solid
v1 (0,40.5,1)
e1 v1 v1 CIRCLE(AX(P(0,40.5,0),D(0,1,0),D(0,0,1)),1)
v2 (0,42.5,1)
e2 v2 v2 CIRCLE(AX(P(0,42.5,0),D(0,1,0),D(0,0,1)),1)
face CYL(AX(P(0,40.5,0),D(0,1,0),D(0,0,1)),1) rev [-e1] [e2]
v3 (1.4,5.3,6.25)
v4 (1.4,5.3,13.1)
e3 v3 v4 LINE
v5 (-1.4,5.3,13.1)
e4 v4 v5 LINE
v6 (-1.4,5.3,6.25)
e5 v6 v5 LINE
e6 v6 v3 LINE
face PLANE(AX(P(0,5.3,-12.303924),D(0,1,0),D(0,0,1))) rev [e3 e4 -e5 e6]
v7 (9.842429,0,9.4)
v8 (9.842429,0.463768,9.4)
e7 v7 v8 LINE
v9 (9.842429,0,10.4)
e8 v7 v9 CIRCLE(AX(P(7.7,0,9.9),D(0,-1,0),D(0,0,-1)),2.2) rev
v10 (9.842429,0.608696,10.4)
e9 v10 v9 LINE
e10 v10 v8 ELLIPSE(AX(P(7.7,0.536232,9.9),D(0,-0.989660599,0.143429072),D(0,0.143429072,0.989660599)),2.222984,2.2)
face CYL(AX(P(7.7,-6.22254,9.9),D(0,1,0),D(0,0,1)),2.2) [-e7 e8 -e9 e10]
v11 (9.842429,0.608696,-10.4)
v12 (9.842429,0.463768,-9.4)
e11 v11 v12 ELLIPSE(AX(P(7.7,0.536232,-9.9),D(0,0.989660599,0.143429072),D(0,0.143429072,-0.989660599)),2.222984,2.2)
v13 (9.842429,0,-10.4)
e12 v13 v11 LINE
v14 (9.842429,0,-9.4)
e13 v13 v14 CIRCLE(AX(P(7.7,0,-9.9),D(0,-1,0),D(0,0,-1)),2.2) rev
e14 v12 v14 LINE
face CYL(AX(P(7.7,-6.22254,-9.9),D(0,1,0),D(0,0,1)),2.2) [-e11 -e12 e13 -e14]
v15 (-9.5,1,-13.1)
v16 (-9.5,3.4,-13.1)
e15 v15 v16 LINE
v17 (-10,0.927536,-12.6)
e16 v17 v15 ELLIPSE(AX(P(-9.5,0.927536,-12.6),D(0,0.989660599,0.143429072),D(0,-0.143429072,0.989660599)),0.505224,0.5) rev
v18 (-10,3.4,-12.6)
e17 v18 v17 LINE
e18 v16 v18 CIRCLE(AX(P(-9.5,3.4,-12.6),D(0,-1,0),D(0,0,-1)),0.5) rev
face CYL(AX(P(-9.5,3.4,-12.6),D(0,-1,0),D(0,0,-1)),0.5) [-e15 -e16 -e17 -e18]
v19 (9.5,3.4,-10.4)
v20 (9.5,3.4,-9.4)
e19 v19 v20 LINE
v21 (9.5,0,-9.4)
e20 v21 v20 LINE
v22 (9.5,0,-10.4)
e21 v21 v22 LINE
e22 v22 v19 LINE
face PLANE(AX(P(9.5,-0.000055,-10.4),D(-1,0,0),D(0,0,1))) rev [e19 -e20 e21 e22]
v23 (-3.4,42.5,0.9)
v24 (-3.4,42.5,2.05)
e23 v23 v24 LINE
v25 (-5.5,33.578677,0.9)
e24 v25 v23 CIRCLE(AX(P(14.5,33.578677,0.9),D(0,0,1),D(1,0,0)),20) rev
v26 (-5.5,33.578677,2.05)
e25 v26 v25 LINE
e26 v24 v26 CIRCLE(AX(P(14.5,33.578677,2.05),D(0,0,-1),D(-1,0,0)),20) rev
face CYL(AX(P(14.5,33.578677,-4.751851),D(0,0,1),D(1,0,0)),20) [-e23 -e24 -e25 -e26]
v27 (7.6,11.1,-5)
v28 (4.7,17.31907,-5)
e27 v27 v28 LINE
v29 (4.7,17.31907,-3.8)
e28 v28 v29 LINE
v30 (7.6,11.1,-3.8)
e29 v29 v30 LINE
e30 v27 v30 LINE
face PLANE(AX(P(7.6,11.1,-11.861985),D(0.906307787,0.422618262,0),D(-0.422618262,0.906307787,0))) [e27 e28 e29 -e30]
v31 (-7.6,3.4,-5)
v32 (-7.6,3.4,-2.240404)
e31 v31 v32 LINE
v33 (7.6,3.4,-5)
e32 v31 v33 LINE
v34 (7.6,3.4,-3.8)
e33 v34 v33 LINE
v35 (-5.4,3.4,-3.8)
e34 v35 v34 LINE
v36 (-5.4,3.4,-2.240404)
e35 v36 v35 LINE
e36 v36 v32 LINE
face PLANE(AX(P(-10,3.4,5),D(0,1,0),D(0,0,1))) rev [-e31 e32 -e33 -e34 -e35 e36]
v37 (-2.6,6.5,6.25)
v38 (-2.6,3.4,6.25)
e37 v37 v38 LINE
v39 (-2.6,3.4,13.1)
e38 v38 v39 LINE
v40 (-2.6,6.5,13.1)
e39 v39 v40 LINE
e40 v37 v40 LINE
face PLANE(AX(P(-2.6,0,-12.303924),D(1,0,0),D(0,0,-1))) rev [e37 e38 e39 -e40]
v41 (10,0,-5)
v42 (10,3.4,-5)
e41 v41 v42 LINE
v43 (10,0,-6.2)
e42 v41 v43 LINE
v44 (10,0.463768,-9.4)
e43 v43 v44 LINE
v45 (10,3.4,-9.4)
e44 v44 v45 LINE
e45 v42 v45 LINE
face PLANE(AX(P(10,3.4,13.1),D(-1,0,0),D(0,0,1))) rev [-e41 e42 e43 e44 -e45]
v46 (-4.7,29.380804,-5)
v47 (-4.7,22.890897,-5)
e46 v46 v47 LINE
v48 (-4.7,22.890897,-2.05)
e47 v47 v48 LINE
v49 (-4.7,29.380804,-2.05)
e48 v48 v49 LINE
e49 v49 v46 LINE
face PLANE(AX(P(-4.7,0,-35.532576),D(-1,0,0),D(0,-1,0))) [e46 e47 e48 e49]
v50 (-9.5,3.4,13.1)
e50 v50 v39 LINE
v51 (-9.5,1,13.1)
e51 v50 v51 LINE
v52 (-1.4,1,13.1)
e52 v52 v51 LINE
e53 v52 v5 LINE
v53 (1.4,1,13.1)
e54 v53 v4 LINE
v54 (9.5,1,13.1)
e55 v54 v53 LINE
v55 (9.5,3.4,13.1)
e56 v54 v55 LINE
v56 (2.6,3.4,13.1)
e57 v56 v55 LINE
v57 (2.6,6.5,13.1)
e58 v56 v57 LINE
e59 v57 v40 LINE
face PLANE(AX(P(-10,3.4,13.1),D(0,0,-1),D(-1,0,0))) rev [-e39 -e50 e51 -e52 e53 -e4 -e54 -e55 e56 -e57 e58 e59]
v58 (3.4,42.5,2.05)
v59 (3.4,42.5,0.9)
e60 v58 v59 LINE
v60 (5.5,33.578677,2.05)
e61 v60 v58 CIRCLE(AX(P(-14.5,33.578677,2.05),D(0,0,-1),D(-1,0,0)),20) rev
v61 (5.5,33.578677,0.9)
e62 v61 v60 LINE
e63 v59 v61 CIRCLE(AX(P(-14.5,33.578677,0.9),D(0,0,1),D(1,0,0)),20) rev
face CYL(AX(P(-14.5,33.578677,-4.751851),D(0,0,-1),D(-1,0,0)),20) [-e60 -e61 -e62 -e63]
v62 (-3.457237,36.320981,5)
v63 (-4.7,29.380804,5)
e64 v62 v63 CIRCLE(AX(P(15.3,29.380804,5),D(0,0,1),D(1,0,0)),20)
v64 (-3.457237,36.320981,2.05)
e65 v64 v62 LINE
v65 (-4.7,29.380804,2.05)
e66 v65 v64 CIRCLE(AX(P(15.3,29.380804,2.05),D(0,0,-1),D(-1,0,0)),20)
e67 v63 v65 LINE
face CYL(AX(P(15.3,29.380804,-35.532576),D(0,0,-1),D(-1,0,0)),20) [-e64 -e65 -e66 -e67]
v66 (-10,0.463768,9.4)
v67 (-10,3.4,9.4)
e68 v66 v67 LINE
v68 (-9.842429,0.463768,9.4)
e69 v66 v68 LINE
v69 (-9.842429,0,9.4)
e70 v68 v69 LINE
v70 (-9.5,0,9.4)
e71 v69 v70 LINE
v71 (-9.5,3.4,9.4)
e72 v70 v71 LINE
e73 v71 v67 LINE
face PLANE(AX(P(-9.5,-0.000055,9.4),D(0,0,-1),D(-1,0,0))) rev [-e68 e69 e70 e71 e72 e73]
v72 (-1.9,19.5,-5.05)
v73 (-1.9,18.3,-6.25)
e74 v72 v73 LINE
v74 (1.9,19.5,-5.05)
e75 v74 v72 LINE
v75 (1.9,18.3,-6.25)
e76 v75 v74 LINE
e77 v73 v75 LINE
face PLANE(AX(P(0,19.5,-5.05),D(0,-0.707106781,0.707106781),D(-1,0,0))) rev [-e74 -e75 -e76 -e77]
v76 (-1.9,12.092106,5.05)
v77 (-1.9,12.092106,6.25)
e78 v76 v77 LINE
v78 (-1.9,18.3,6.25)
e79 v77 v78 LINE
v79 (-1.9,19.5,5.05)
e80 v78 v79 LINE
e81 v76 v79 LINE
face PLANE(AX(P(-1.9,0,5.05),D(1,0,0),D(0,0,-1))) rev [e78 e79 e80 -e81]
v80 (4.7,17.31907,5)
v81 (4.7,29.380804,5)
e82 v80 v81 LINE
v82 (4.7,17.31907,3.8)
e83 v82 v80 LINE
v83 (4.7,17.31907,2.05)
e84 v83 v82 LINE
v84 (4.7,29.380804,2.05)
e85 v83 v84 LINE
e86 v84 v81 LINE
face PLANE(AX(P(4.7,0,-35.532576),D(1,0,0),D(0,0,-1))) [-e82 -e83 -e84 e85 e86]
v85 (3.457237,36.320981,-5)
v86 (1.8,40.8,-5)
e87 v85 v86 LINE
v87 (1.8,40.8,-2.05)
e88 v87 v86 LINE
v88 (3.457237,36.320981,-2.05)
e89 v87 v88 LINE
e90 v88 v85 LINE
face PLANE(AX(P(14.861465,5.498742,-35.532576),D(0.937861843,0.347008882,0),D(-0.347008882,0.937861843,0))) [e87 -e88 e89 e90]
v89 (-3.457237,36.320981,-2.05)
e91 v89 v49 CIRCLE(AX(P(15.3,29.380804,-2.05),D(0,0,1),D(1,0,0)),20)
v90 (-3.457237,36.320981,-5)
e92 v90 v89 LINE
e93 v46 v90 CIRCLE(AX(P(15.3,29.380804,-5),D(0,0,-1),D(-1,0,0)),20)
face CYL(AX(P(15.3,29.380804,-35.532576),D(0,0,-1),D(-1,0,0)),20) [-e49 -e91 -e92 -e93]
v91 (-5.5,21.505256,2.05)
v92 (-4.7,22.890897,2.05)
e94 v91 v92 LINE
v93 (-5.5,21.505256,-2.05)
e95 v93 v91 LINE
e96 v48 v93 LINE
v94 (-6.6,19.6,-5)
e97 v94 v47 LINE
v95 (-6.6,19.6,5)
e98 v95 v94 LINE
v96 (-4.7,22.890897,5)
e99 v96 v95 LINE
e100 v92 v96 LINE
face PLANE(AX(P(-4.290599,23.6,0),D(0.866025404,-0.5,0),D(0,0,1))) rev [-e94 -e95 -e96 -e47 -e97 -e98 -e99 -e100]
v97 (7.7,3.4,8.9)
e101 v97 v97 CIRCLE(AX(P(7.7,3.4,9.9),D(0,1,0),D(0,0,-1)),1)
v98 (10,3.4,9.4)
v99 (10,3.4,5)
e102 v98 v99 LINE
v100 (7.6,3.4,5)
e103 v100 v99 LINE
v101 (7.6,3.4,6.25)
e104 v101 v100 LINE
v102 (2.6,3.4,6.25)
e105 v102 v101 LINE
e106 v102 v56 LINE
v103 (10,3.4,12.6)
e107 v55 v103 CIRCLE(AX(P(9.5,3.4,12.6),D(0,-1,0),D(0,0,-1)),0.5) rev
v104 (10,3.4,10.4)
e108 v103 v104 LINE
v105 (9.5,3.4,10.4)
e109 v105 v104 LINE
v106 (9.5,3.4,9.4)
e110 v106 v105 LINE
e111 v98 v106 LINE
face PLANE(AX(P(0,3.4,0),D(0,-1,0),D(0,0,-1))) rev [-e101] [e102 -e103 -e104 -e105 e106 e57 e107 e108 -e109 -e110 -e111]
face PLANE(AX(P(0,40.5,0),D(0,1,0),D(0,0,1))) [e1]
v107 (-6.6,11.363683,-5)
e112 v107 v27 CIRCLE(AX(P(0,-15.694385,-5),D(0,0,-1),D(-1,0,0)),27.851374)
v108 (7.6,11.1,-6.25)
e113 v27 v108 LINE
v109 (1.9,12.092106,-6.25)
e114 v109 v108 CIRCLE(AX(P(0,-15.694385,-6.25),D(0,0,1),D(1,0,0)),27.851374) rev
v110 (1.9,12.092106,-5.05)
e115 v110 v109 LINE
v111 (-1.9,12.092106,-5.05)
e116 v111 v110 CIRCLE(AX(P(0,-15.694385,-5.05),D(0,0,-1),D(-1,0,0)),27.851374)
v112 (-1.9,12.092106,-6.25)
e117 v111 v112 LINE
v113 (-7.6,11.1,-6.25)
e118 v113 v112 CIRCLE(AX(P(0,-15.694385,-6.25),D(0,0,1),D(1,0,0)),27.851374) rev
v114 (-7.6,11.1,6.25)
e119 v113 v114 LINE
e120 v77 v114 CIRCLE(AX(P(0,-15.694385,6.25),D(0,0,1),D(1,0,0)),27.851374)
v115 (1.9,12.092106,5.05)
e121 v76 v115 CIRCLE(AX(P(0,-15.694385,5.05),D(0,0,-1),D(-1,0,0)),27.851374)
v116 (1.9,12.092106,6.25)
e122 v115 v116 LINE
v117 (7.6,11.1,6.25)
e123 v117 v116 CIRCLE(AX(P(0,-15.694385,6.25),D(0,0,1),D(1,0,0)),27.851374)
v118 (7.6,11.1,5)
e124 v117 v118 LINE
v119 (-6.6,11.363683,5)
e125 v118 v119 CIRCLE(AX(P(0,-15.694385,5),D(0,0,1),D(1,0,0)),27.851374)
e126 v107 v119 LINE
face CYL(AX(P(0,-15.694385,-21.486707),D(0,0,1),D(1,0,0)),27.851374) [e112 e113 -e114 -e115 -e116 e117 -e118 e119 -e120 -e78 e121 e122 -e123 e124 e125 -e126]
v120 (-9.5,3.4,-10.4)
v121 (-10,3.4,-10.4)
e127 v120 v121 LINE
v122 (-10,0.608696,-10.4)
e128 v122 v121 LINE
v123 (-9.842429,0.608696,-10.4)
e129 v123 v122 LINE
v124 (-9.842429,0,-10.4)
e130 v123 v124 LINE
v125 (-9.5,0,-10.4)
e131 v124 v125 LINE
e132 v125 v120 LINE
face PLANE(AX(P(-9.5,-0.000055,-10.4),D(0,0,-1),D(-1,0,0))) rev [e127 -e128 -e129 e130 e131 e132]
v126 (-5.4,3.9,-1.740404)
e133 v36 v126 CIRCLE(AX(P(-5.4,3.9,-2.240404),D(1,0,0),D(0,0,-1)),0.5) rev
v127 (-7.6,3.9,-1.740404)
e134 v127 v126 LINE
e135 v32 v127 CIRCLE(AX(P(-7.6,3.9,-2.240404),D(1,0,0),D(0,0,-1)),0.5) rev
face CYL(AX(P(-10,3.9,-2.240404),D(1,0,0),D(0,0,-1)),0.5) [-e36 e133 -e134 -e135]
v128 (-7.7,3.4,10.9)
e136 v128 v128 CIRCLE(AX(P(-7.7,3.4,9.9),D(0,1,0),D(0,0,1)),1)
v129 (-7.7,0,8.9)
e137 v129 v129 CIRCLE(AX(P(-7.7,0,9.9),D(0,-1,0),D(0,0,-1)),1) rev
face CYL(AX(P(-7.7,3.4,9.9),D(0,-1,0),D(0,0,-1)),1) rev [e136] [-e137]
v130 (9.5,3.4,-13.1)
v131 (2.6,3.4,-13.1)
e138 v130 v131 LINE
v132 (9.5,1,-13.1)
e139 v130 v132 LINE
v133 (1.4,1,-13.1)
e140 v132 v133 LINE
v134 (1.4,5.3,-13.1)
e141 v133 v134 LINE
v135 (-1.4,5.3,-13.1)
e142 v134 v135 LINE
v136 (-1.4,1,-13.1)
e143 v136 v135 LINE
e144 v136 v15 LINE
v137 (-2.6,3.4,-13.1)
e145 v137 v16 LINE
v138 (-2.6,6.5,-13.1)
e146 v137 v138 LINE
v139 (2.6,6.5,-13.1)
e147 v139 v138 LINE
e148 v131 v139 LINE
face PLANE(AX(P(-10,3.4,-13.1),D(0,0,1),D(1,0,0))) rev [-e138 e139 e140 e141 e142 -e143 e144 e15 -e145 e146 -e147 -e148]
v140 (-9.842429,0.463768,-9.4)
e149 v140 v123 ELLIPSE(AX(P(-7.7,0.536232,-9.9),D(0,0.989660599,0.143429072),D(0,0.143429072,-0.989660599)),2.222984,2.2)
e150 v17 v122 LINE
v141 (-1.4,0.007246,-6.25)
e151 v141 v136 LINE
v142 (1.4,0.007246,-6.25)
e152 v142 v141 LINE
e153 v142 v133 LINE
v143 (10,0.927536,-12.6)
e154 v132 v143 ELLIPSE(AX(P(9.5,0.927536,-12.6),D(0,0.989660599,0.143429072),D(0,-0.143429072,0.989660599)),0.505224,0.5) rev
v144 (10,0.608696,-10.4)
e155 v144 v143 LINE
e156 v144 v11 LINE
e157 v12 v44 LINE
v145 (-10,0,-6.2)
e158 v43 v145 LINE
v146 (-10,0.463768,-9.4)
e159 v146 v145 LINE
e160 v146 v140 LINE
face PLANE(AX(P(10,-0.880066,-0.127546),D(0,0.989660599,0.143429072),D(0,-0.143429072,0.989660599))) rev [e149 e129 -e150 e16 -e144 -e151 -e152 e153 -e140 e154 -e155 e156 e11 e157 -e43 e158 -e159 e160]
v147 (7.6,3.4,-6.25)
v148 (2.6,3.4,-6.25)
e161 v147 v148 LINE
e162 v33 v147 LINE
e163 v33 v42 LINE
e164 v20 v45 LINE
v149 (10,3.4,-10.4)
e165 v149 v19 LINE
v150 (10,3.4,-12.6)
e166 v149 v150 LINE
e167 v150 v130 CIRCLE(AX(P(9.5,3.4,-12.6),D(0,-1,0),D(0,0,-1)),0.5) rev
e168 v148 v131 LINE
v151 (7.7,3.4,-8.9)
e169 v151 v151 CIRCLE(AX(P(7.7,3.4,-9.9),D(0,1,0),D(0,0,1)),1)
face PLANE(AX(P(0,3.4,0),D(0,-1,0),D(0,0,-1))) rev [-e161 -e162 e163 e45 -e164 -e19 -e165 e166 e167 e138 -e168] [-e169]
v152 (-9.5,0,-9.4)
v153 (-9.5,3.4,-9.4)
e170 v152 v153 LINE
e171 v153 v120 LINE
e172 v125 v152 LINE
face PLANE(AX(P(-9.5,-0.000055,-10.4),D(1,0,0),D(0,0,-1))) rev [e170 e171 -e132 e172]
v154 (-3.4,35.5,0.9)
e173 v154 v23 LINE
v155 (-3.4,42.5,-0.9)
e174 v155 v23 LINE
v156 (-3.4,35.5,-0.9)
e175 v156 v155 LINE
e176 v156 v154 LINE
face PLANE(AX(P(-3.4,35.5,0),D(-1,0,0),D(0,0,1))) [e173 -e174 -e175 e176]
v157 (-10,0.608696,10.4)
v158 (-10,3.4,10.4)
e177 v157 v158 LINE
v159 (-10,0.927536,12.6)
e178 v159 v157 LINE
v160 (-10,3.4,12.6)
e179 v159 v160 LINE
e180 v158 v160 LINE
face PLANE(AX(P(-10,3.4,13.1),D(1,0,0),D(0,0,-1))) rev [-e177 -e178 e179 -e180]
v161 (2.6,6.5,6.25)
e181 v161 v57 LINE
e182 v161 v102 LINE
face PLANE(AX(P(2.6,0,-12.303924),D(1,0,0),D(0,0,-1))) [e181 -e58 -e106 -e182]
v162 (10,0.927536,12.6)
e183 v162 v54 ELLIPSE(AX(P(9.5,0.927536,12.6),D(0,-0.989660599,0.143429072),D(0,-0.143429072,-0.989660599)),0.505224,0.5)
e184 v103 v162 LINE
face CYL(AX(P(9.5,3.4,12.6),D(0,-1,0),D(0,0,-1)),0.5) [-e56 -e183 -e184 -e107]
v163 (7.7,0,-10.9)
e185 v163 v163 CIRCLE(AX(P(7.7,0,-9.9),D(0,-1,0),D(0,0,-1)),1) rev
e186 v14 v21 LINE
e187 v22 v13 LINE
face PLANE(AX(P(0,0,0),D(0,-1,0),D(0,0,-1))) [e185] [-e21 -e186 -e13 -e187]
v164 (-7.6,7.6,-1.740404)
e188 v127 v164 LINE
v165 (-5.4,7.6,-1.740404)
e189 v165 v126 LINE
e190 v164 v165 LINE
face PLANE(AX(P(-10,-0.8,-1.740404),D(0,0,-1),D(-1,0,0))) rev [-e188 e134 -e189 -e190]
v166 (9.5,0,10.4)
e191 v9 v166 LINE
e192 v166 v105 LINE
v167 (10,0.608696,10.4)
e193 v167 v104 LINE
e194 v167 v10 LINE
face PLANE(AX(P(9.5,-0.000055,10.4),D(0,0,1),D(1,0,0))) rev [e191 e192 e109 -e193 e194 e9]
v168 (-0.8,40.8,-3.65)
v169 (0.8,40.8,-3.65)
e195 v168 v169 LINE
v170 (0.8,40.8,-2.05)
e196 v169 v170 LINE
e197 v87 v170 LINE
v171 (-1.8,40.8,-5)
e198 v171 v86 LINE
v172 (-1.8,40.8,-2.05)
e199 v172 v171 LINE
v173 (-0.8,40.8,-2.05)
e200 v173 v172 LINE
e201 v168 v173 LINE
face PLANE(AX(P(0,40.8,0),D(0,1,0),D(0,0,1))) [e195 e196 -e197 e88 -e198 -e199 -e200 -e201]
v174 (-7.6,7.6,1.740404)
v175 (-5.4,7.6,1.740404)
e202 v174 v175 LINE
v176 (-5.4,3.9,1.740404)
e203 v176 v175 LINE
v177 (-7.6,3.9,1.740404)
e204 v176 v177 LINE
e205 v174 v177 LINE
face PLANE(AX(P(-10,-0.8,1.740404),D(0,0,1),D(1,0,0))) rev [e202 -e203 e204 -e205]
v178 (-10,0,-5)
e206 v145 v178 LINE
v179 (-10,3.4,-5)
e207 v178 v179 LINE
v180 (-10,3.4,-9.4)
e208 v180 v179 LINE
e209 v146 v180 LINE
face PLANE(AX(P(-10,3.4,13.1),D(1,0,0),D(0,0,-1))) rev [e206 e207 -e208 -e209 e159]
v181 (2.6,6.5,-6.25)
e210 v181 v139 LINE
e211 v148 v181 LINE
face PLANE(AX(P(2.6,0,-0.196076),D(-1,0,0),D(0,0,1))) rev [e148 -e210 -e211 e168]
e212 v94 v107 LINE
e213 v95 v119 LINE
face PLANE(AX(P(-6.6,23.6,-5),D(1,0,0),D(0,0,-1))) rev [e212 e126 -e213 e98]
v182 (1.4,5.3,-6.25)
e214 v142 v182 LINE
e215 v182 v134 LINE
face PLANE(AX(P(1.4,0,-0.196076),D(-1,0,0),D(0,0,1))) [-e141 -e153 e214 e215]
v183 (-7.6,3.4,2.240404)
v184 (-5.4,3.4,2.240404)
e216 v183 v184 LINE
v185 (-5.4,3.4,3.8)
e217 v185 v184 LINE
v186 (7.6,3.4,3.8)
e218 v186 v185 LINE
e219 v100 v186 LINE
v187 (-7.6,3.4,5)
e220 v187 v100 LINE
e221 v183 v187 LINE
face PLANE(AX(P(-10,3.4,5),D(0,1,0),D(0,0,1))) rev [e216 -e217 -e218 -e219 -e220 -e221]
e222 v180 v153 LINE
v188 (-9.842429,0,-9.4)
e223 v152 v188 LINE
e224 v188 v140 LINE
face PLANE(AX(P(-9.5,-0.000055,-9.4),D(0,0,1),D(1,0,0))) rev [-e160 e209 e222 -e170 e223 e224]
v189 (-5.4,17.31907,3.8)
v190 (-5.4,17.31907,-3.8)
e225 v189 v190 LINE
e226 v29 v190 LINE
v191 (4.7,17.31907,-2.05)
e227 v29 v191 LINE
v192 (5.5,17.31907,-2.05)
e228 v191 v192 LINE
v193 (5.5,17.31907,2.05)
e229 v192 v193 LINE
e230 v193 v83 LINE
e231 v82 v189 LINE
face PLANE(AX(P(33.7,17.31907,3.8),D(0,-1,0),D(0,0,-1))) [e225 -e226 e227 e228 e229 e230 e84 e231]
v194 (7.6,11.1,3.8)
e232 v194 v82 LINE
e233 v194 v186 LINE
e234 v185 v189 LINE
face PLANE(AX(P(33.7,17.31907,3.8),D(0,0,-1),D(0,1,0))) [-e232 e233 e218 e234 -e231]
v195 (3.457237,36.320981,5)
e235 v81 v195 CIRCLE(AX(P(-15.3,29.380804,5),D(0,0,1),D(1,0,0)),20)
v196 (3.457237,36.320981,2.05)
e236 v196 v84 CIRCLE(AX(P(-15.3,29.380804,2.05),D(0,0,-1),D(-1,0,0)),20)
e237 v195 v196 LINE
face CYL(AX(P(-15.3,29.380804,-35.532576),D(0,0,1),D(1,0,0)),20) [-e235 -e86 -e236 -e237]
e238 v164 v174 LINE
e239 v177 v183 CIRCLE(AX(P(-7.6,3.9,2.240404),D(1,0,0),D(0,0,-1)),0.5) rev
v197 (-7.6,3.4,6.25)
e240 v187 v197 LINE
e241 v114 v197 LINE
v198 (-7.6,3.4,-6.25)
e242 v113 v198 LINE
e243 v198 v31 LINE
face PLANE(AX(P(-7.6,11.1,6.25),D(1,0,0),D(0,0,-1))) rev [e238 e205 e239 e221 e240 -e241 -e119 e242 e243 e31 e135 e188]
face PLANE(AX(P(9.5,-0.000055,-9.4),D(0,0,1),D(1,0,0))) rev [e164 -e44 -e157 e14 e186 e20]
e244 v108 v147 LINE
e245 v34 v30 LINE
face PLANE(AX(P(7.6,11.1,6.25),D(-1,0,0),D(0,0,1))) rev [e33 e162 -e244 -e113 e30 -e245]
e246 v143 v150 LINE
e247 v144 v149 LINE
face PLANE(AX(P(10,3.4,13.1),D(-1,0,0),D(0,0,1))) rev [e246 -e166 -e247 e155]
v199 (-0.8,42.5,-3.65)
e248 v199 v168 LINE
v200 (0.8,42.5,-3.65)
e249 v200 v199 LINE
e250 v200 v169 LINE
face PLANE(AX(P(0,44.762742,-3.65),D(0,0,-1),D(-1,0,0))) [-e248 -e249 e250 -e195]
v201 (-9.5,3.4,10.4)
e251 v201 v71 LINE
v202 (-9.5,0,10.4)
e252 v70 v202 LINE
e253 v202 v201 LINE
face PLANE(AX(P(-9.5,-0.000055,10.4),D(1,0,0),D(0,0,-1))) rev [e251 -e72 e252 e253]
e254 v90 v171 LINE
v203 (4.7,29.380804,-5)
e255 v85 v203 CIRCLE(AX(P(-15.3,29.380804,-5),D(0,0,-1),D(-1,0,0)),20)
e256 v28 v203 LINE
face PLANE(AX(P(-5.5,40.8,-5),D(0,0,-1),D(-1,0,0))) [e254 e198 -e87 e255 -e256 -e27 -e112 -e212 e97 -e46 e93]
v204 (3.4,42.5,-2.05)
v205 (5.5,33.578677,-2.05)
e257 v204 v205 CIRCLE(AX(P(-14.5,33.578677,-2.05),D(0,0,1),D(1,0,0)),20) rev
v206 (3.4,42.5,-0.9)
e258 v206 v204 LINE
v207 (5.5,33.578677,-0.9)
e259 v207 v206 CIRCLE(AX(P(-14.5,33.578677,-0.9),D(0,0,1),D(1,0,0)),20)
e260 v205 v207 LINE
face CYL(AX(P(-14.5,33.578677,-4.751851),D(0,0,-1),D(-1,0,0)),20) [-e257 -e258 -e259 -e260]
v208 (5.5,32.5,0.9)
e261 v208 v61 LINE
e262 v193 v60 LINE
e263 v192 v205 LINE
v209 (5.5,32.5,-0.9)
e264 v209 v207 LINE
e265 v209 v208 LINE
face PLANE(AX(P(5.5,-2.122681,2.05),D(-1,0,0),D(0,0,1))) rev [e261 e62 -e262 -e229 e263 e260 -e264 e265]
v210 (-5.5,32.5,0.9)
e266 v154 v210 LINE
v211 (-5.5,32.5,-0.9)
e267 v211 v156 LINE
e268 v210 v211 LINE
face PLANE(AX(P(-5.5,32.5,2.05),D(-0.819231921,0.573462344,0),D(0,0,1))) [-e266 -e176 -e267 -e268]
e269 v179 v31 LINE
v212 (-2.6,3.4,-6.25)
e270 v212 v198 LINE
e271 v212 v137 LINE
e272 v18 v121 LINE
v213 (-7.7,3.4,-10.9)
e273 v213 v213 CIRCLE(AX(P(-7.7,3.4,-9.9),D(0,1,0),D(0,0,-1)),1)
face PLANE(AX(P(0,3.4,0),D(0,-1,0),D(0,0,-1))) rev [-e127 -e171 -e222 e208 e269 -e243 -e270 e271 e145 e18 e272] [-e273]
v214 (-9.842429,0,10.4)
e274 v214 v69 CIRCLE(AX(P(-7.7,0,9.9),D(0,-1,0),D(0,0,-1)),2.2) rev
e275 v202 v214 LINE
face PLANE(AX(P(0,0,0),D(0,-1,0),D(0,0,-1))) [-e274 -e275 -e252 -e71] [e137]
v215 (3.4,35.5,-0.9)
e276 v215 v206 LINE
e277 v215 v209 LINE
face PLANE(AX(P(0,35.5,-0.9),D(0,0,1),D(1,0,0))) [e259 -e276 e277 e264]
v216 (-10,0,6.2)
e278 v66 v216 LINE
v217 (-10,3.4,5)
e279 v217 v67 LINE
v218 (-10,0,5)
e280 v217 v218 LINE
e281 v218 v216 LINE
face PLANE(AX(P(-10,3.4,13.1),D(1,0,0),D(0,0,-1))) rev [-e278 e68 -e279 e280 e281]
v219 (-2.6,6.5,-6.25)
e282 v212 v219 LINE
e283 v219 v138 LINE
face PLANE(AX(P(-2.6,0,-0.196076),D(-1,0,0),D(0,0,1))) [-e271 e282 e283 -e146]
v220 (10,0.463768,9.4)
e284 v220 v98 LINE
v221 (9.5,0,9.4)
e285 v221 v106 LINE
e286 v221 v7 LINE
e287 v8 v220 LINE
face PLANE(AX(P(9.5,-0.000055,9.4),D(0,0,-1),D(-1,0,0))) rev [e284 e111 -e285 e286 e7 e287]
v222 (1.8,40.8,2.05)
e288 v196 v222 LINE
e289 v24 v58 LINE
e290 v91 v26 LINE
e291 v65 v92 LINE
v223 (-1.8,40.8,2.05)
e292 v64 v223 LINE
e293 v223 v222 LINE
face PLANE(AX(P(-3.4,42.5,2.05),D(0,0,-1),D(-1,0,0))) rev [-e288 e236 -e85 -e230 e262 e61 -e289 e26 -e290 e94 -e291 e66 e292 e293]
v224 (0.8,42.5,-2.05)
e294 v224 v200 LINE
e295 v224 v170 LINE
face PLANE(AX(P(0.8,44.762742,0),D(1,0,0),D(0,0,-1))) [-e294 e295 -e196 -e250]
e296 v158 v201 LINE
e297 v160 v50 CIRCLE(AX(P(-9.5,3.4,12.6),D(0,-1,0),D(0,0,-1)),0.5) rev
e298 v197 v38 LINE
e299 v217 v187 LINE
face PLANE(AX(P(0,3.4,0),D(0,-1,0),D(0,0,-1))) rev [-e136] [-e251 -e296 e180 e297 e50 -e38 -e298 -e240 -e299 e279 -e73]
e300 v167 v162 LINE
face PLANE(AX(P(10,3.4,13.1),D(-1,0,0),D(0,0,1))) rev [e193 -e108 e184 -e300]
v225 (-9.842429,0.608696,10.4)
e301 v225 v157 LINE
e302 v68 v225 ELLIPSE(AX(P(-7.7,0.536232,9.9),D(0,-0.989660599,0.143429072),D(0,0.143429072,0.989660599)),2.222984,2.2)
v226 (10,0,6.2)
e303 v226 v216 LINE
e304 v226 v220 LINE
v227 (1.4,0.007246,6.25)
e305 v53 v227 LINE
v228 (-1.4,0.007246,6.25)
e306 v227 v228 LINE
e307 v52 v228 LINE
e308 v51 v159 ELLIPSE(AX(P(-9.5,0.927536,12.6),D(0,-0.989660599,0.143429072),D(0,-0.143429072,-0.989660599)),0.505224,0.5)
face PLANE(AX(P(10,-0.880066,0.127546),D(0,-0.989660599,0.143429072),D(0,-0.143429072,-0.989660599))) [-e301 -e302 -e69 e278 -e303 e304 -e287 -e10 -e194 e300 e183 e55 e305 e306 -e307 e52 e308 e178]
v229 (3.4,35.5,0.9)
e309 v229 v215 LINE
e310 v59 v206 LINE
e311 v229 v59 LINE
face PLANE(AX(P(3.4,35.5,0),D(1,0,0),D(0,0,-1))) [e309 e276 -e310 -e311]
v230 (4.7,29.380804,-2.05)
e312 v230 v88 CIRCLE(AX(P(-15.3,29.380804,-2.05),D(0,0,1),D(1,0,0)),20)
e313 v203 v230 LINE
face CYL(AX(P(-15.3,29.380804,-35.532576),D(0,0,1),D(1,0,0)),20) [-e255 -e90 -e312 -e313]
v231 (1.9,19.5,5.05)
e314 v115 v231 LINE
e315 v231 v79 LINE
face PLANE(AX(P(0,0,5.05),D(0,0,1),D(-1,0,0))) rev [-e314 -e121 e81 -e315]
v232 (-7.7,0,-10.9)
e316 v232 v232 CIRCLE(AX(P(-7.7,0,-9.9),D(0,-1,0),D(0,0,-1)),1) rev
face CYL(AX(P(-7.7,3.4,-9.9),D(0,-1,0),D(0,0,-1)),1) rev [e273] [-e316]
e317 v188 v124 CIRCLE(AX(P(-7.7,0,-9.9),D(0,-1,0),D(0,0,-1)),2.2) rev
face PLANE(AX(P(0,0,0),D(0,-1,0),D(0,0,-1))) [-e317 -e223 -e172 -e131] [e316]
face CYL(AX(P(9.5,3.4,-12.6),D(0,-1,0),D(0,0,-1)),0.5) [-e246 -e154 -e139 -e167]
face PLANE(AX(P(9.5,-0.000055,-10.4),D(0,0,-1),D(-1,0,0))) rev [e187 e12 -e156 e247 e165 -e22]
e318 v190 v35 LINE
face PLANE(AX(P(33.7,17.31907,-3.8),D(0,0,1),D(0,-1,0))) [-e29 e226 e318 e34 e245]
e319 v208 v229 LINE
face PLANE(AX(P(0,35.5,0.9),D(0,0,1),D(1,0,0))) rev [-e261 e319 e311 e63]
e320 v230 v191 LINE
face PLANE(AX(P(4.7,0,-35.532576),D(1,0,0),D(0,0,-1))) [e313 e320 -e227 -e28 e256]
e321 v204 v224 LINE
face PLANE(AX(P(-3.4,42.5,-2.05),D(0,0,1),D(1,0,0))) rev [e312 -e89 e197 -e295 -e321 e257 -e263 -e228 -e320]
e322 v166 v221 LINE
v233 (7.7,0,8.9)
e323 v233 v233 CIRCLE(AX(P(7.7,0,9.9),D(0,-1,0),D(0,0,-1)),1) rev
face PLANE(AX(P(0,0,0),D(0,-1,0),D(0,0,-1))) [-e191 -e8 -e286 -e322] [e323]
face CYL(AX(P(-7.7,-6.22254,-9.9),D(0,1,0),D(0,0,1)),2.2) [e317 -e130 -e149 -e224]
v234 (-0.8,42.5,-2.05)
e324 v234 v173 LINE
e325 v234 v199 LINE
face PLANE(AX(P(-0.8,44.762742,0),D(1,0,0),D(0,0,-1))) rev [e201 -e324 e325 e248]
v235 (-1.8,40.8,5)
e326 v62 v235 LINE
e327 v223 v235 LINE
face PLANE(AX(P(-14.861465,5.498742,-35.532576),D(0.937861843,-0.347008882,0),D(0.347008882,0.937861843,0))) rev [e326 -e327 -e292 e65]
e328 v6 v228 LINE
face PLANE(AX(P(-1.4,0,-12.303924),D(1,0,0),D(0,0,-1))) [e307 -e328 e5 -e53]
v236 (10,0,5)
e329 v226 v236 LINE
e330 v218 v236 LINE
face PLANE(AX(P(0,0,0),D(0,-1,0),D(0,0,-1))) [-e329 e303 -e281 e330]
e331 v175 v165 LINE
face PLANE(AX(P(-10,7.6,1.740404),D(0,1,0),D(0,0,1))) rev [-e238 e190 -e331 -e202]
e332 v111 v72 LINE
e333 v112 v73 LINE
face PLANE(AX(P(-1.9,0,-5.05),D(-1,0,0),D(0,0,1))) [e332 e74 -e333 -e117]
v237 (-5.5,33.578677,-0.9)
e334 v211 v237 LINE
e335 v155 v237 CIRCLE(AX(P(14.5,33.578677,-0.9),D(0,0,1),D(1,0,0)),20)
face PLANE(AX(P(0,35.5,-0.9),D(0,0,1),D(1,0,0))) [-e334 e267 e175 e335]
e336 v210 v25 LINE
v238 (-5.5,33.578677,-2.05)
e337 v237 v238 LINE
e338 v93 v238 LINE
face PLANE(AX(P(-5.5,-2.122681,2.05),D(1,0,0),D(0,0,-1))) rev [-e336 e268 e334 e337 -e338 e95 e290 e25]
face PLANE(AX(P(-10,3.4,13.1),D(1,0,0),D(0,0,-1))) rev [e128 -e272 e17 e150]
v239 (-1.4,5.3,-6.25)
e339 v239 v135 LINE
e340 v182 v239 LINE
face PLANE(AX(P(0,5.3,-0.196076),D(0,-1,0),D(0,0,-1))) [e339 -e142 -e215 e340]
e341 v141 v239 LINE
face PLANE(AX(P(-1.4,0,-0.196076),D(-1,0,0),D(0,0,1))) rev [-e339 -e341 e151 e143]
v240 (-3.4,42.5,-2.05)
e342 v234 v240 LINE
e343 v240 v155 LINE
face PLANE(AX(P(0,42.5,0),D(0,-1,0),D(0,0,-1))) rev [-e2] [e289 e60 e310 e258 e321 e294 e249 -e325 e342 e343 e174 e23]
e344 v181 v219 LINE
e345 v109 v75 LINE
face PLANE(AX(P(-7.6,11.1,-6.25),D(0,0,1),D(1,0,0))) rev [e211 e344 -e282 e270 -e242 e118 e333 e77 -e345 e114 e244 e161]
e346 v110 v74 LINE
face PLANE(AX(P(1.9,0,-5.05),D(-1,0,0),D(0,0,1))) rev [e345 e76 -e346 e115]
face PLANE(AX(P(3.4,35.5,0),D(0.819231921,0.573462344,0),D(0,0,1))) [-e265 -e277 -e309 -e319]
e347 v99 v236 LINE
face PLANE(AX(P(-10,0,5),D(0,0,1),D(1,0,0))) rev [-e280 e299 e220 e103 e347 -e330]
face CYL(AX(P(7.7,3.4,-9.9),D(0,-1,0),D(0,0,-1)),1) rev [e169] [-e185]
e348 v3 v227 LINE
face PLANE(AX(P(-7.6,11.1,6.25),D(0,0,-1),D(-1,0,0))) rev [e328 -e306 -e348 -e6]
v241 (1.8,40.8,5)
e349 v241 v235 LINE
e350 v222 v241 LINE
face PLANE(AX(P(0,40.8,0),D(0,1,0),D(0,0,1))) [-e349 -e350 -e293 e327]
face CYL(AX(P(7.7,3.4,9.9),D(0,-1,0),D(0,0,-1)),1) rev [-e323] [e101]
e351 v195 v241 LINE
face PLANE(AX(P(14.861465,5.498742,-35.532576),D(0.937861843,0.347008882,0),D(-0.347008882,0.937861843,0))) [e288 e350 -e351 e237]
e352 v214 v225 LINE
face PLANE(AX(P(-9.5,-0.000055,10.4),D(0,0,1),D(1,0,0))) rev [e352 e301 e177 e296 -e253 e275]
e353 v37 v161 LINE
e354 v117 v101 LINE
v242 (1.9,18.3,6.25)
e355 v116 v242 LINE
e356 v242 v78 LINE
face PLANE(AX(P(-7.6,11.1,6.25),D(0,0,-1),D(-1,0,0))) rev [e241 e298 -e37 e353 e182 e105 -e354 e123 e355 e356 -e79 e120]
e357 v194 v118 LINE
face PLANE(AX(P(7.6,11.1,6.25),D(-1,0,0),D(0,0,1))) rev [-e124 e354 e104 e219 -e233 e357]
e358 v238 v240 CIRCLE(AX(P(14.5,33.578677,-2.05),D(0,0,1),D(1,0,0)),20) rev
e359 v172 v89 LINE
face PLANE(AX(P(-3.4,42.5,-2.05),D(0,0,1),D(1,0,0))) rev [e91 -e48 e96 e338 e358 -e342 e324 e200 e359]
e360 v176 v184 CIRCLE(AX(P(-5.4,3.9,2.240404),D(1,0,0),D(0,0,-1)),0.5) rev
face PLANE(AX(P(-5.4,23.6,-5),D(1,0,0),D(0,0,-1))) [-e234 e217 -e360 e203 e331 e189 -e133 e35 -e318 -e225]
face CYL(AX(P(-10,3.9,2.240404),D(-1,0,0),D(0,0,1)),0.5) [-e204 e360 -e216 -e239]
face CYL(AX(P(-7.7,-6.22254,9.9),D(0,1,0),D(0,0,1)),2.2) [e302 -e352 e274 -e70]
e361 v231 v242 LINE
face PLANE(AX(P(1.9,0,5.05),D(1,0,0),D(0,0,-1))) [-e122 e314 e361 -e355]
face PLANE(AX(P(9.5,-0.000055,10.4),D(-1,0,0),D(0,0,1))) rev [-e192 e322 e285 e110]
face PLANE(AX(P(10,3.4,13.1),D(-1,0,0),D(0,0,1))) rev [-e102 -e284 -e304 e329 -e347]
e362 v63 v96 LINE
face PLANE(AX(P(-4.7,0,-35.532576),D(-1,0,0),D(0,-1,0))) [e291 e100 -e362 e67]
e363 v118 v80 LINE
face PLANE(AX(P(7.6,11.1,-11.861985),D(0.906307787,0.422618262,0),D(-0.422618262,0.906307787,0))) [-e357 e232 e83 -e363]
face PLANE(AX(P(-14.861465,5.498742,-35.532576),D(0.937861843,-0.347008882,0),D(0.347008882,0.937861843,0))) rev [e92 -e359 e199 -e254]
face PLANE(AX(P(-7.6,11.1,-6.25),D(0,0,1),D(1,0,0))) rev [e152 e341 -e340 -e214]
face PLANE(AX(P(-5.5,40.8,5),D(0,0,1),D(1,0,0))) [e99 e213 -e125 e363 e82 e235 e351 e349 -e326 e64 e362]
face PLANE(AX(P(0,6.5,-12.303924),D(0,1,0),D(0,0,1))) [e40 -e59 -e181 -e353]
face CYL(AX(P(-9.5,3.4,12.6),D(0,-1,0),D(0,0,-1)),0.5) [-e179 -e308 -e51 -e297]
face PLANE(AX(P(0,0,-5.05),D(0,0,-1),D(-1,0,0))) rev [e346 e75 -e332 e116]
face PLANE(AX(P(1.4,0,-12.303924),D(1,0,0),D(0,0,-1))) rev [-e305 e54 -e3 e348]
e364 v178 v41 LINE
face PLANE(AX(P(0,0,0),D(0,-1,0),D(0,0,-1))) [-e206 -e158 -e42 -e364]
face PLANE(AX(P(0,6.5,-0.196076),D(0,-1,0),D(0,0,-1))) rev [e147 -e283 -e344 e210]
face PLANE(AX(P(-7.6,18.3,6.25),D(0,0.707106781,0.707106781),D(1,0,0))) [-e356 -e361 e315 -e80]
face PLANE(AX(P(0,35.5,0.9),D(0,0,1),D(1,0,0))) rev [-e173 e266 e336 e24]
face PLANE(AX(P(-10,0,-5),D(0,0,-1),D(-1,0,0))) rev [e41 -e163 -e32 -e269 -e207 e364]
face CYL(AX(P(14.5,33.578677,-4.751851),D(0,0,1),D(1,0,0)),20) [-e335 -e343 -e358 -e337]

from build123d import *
from OCP.BRepFilletAPI import BRepFilletAPI_MakeChamfer

# Parameters (mm, degrees)
SKETCH1_W                 = 20
SKETCH1_H                 = 26.2
SKETCH1_R                 = 1
BOSS_EXTRUDE1_DEPTH       = 3.4
SKETCH2_W                 = 11
SKETCH2_H                 = 10
BOSS_EXTRUDE2_DEPTH       = 40.8
SKETCH3_W                 = 6.8
SKETCH3_H                 = 4.1
BOSS_EXTRUDE3_DEPTH       = 1.7
SKETCH4_R                 = 1
CUT_EXTRUDE1_DEPTH        = 2
CUT_EXTRUDE2_START        = -10
SKETCH6_W                 = 0.8
SKETCH6_H                 = 27.4
CUT_EXTRUDE2_DEPTH        = 10
BOSS_EXTRUDE4_DEPTH       = 4.1
SKETCH9_W                 = 3.7
SKETCH9_H                 = 4.1
BOSS_EXTRUDE5_DEPTH       = 37.4
SKETCH10_W                = 2.1
SKETCH10_H                = 1.8
CUT_EXTRUDE3_DEPTH        = 7
CHAMFER1_SIZE             = 3
CHAMFER1_SIZE_2           = 2.1
FILLET1_R                 = 20
FILLET2_R                 = 20
SKETCH11_W                = 15.2
SKETCH11_H                = 12.5
BOSS_EXTRUDE6_DEPTH       = 7.7
SKETCH12_W                = 6.6
SKETCH12_H                = 10
BOSS_EXTRUDE7_DEPTH       = 12.5
CHAMFER2_SIZE             = 4
CHAMFER2_SIZE_2           = 2.309401077
BOSS_EXTRUDE8_REACH       = 49.264
BOSS_EXTRUDE9_REACH       = 49.756
SKETCH16_W                = 3.480808908
SKETCH16_H                = 8.4
CUT_EXTRUDE4_DEPTH        = 49.763305876
SKETCH17_W                = 10
SKETCH17_H                = 3.4
CUT_EXTRUDE5_DEPTH        = 49.763305876
BOSS_EXTRUDE10_START      = -26.2
BOSS_EXTRUDE10_DEPTH      = 26.2
SKETCH19_W                = 3.480808908
SKETCH19_H                = 4.2
CUT_EXTRUDE6_DEPTH        = 48.829070658
SKETCH20_W                = 2.8
SKETCH20_H                = 3.4
CUT_EXTRUDE7_DEPTH        = 6.85
SKETCH21_W                = 2.8
SKETCH21_H                = 3.4
CUT_EXTRUDE8_DEPTH        = 6.85
BOSS_EXTRUDE11_START      = -1.2
BOSS_EXTRUDE11_DEPTH      = 1.2
CHAMFER3_SIZE             = 1.2
CHAMFER3_OF_MIRROR10_SIZE = 1.2
FILLET3_R                 = 0.5
CUT_EXTRUDE10_DEPTH       = 49.763305876
CUT_EXTRUDE10_DEPTH_BACK  = 49.763305876
BOSS_EXTRUDE12_START      = -3.4
SKETCH26_R                = 2.2
SKETCH26_R_2              = 1
BOSS_EXTRUDE12_DEPTH      = 3.4
SKETCH27_W                = 1.6
SKETCH27_H                = 1.6
BOSS_EXTRUDE13_DEPTH      = 1.7
CUT_EXTRUDE12_DEPTH       = 29
CUT_EXTRUDE12_DEPTH_BACK  = 10.1
SKETCH28_W                = 7.6
SKETCH28_H                = 15
FILLET4_R                 = 0.5
SKETCH29_W                = 0.5
SKETCH29_H                = 1
CUT_EXTRUDE13_DEPTH       = 43.43135633


# Some blends are built 0.0001 mm under size
with BuildPart() as part:
    # Sketch1 → Boss-Extrude1 (new body)
    with BuildSketch(Plane(origin=(0, 0, 0), x_dir=(1, 0, 0), z_dir=(0, 1, 0))):
        Rectangle(SKETCH1_W, SKETCH1_H)
        with Locations(Location((7.7, 9.9, 0), (0, 0, 270))):
            Circle(SKETCH1_R, mode=Mode.SUBTRACT)
        with Locations(Location((-7.7, 9.9, 0), (0, 0, 90))):
            Circle(SKETCH1_R, mode=Mode.SUBTRACT)
        with Locations(Location((7.7, -9.9, 0), (0, 0, 90))):
            Circle(SKETCH1_R, mode=Mode.SUBTRACT)
        with Locations(Location((-7.7, -9.9, 0), (0, 0, 270))):
            Circle(SKETCH1_R, mode=Mode.SUBTRACT)
    extrude(amount=BOSS_EXTRUDE1_DEPTH)

    # Sketch2 → Boss-Extrude2 (add)
    with BuildSketch(Plane.XZ):
        Rectangle(SKETCH2_W, SKETCH2_H)
    extrude(amount=-BOSS_EXTRUDE2_DEPTH)

    # Sketch3 → Boss-Extrude3 (add)
    with BuildSketch(Plane(origin=(0, 40.8, 0), x_dir=(1, 0, 0), z_dir=(0, 1, 0))):
        Rectangle(SKETCH3_W, SKETCH3_H)
    extrude(amount=BOSS_EXTRUDE3_DEPTH)

    # Sketch4 → Cut-Extrude1 (cut)
    with BuildSketch(Plane(origin=(0, 42.5, 0), x_dir=(1, 0, 0), z_dir=(0, 1, 0))):
        with Locations(Location((0, 0, 0), (0, 0, 270))):
            Circle(SKETCH4_R)
    extrude(amount=-CUT_EXTRUDE1_DEPTH, mode=Mode.SUBTRACT)

    # Sketch6 → Cut-Extrude2 (cut)
    with BuildSketch(Plane.XY.offset(5).offset(CUT_EXTRUDE2_START)):
        with Locations((-5.1, 17.1)):
            Rectangle(SKETCH6_W, SKETCH6_H)
        Polygon((-5.5, 30.8), (-4.7, 32.962162162), (-4.7, 40.8), (-5.5, 40.8), align=None)
        Polygon((-4.7, 30.8), (-4.7, 32.962162162), (-5.5, 30.8), align=None)
        Polygon((-4.7, 32.962162162), (-1.8, 40.8), (-4.7, 40.8), align=None)
        Polygon((4.7, 40.8), (1.8, 40.8), (4.7, 32.962162162), align=None)
        Polygon((5.5, 40.8), (4.7, 40.8), (4.7, 32.962162162), (5.5, 30.8), align=None)
        Polygon((5.5, 30.8), (4.7, 32.962162162), (4.7, 30.8), align=None)
        with Locations((5.1, 17.1)):
            Rectangle(SKETCH6_W, SKETCH6_H)
    cut_extrude2 = extrude(amount=CUT_EXTRUDE2_DEPTH, mode=Mode.SUBTRACT)

    # Sketch7 → Boss-Extrude4 (add)
    with BuildSketch(Plane.XY.offset(2.05)):
        Polygon((-3.4, 42.5), (-5.5, 40.8), (-3.4, 40.8), align=None)
        Polygon((3.4, 42.5), (3.4, 40.8), (5.5, 40.8), align=None)
    extrude(amount=-BOSS_EXTRUDE4_DEPTH)

    # Mirror6: Cut-Extrude2 across plane
    add(cut_extrude2.mirror(Plane.XY), mode=Mode.SUBTRACT)

    # Sketch9 → Boss-Extrude5 (add)
    with BuildSketch(Plane.XZ.offset(-40.8)):
        with Locations((3.65, 0)):
            Rectangle(SKETCH9_W, SKETCH9_H)
        with Locations((-3.65, 0)):
            Rectangle(SKETCH9_W, SKETCH9_H)
    extrude(amount=BOSS_EXTRUDE5_DEPTH)

    # Sketch10 → Cut-Extrude3 (cut)
    with BuildSketch(Plane(origin=(0, 42.5, 0), x_dir=(1, 0, 0), z_dir=(0, 1, 0))):
        with Locations((4.45, 0)):
            Rectangle(SKETCH10_W, SKETCH10_H)
        with Locations((-4.45, 0)):
            Rectangle(SKETCH10_W, SKETCH10_H)
    extrude(amount=-CUT_EXTRUDE3_DEPTH, mode=Mode.SUBTRACT)

    # Chamfer1
    chamfer1_edges_1 = [part.edges().sort_by_distance(p)[0] for p in [
        (-5.5, 35.5, 0),
    ]]
    chamfer1_side_1 = [part.faces().sort_by_distance(p)[0] for p in [
        (-5.5, 35.458, 0),
    ]]
    chamfer1_edges_2 = [part.edges().sort_by_distance(p)[0] for p in [
        (5.5, 35.5, 0),
    ]]
    chamfer1_side_2 = [part.faces().sort_by_distance(p)[0] for p in [
        (5.5, 35.458, 0),
    ]]
    chamfer1 = BRepFilletAPI_MakeChamfer(part.part.solid().wrapped)
    for e in chamfer1_edges_1:
        chamfer1.Add(CHAMFER1_SIZE - 0.0001, CHAMFER1_SIZE_2 - 0.0001, e.wrapped, chamfer1_side_1[0].wrapped)
    for e in chamfer1_edges_2:
        chamfer1.Add(CHAMFER1_SIZE - 0.0001, CHAMFER1_SIZE_2 - 0.0001, e.wrapped, chamfer1_side_2[0].wrapped)
    add(Compound.cast(chamfer1.Shape()), mode=Mode.REPLACE)  # a hair under: the kernel refuses the full size

    # Fillet1
    # the kernel refuses this fillet: 20 mm, written as the material it takes off along each edge
    with BuildSketch(Plane(origin=(5.5, 40.8, 17.15330693), x_dir=(-0.7772448707074852, 0.6291982286679648, 0), z_dir=(0, 0, -1))) as fillet1_piece_1:
        with BuildLine():
            CenterArc((11.001253917, -18.196700658), FILLET1_R, 114.517435757, 26.4915702)
            Line((-4.543643497, -5.612736084), (-4.854541445, -5.361056793))
            Line((-4.854541445, -5.361056793), (-0.310897948, 0.251679291))
            Line((-0.310897948, 0.251679291), (0, 0.4))
            ThreePointArc((0, 0.4), (1.350925609, 0.4), (2.535863163, 0.363934013))
            Line((2.535863163, 0.363934013), (2.701851217, 0))
        make_face()
    extrude(amount=37.256613859, mode=Mode.SUBTRACT)
    with BuildSketch(Plane(origin=(5.5, 40.8, 20.10330693), x_dir=(0, -1, 0), z_dir=(0, 0, -1))) as fillet1_piece_2:
        with BuildLine():
            CenterArc((7.221322772, 20), FILLET1_R, 243.5084298, 26.4915702)
            Line((-1.7, 2.1), (-1.878426455, 1.742))
            ThreePointArc((-1.878426455, 1.742), (-1.160897948, 0.798320709), (-0.310897948, -0.251679291))
            Line((-0.310897948, -0.251679291), (0, -0.4))
            Line((0, -0.4), (7.221322772, -0.4))
            Line((7.221322772, -0.4), (7.221322772, 0))
        make_face()
    extrude(amount=37.256613859, mode=Mode.SUBTRACT)
    with BuildSketch(Plane(origin=(-5.5, 40.8, 20.10330693), x_dir=(0, -1, 0), z_dir=(0, 0, -1)), Plane(origin=(-5.5, 40.8, 17.15330693), x_dir=(0, -1, 0), z_dir=(0, 0, -1))) as fillet1_piece_3:
        with BuildLine():
            CenterArc((7.221322772, -20), FILLET1_R, 90, 26.4915702)
            Line((-1.7, -2.1), (-1.878426455, -1.742))
            ThreePointArc((-1.878426455, -1.742), (-1.160897948, -0.798320709), (-0.310897948, 0.251679291))
            Line((-0.310897948, 0.251679291), (0, 0.4))
            Line((0, 0.4), (7.221322772, 0.4))
            Line((7.221322772, 0.4), (7.221322772, 0))
        make_face()
    extrude(amount=37.256613859, mode=Mode.SUBTRACT)

    # Fillet2
    fillet2_edges = [part.edges().sort_by_distance(p)[0] for p in [
        (4.7, 32.962162162, 3.525),
        (-4.7, 32.962162162, 3.525),
        (-4.7, 32.962162162, -3.525),
        (4.7, 32.962162162, -3.525),
    ]]
    fillet(fillet2_edges, radius=FILLET2_R)

    # Sketch11 → Boss-Extrude6 (add)
    with BuildSketch(Plane(origin=(0, 3.4, 0), x_dir=(1, 0, 0), z_dir=(0, 1, 0))):
        Rectangle(SKETCH11_W, SKETCH11_H)
    extrude(amount=BOSS_EXTRUDE6_DEPTH)

    # Sketch12 → Boss-Extrude7 (add)
    with BuildSketch(Plane(origin=(0, 11.1, 0), x_dir=(1, 0, 0), z_dir=(0, 1, 0))):
        with Locations((-3.3, 0)):
            Rectangle(SKETCH12_W, SKETCH12_H)
    extrude(amount=BOSS_EXTRUDE7_DEPTH)

    # Chamfer2
    # the kernel refuses this chamfer: 4, 2.309401077 mm, written as the material it takes off along each edge
    with BuildSketch(Plane(origin=(-6.6, 23.6, -15.348343019), x_dir=(-0.01932676561270072, -0.9998132206222079, 0), z_dir=(0, 0, 1))) as chamfer2_piece_1_section:
        Polygon((CHAMFER2_SIZE * 0.999813220622, CHAMFER2_SIZE * 0.0193267656127), (-CHAMFER2_SIZE_2 * 0.0193267656107, CHAMFER2_SIZE_2 * 0.999813220518), (0, 0), align=None)
    chamfer2_piece_1 = extrude(amount=30.696686037, mode=Mode.PRIVATE)
    chamfer2_piece_1 = split(chamfer2_piece_1, bisect_by=Plane(origin=(-5.5, 22.026681043, -3.525), z_dir=(-1, 0, 0)), keep=Keep.TOP, mode=Mode.PRIVATE)
    add(chamfer2_piece_1, mode=Mode.SUBTRACT)
    with BuildSketch(Plane(origin=(-6.6, 23.6, -15.348343019), x_dir=(-0.01932676561270072, -0.9998132206222079, 0), z_dir=(0, 0, 1))) as chamfer2_piece_2_section:
        Polygon((CHAMFER2_SIZE * 0.999813220622, CHAMFER2_SIZE * 0.0193267656127), (-CHAMFER2_SIZE_2 * 0.0193267656107, CHAMFER2_SIZE_2 * 0.999813220518), (0, 0), align=None)
    chamfer2_piece_2 = extrude(amount=30.696686037, mode=Mode.PRIVATE)
    chamfer2_piece_2 = split(chamfer2_piece_2, bisect_by=Plane(origin=(-5.165892343, 22.841973663, -2.05), z_dir=(0, 0, -1)), keep=Keep.TOP, mode=Mode.PRIVATE)
    chamfer2_piece_2 = split(chamfer2_piece_2, bisect_by=Plane(origin=(-4.7, 22.841973663, -3.525), z_dir=(-1, 0, 0)), keep=Keep.TOP, mode=Mode.PRIVATE)
    add(chamfer2_piece_2, mode=Mode.SUBTRACT)
    with BuildSketch(Plane(origin=(-6.6, 23.6, -15.348343019), x_dir=(-0.01932676561270072, -0.9998132206222079, 0), z_dir=(0, 0, 1))) as chamfer2_piece_3_section:
        Polygon((CHAMFER2_SIZE * 0.999813220622, CHAMFER2_SIZE * 0.0193267656127), (-CHAMFER2_SIZE_2 * 0.0193267656107, CHAMFER2_SIZE_2 * 0.999813220518), (0, 0), align=None)
    chamfer2_piece_3 = extrude(amount=30.696686037, mode=Mode.PRIVATE)
    chamfer2_piece_3 = split(chamfer2_piece_3, bisect_by=Plane(origin=(-5.165892343, 22.841973663, 2.05), z_dir=(0, 0, 1)), keep=Keep.TOP, mode=Mode.PRIVATE)
    chamfer2_piece_3 = split(chamfer2_piece_3, bisect_by=Plane(origin=(-4.7, 22.841973663, 3.525), z_dir=(-1, 0, 0)), keep=Keep.TOP, mode=Mode.PRIVATE)
    add(chamfer2_piece_3, mode=Mode.SUBTRACT)

    # Boss-Extrude8: up to this face of the body (flat: up to its plane)
    boss_extrude8_end = Plane(part.part.faces().sort_by_distance((-0.39355153, 24.213344947, -5))[0])
    # Sketch14 → Boss-Extrude8 (add, up to the picked face)
    with BuildSketch(Plane.XY.offset(5), mode=Mode.PRIVATE) as boss_extrude8_sk1:
        Polygon((4.7, 11.1), (7.6, 11.1), (4.7, 17.319070069), align=None)
    boss_extrude8_tool1 = split(extrude(boss_extrude8_sk1.sketch, amount=-BOSS_EXTRUDE8_REACH, mode=Mode.PRIVATE), bisect_by=boss_extrude8_end, keep=Keep.BOTH, mode=Mode.PRIVATE)
    add(boss_extrude8_tool1.solids().sort_by(Axis((5.666667, 13.173023, 5), (0, 0, -1)))[0])

    # Boss-Extrude9: up to this face of the body (flat: up to its plane)
    boss_extrude9_end = Plane(part.part.faces().sort_by_distance((0, 7.25, -6.25))[0])
    # Sketch15 → Boss-Extrude9 (add, up to the picked face)
    with BuildSketch(Plane.XY.offset(6.25), mode=Mode.PRIVATE) as boss_extrude9_sk1:
        with BuildLine():
            ThreePointArc((7.6, 11.1), (0, 12.156989625), (-7.6, 11.1))
            Line((-7.6, 11.1), (7.6, 11.1))
        make_face()
    boss_extrude9_tool1 = split(extrude(boss_extrude9_sk1.sketch, amount=-BOSS_EXTRUDE9_REACH, mode=Mode.PRIVATE), bisect_by=boss_extrude9_end, keep=Keep.BOTH, mode=Mode.PRIVATE)
    add(boss_extrude9_tool1.solids().sort_by(Axis((0, 11.523491, 6.25), (0, 0, -1)))[0])

    # Sketch16 → Cut-Extrude4 (cut, through all)
    with BuildSketch(Plane(origin=(10, 0, 0), x_dir=(0, 0, -1), z_dir=(1, 0, 0))):
        with Locations((0, 3.4)):
            Rectangle(SKETCH16_W, SKETCH16_H)
    extrude(amount=-CUT_EXTRUDE4_DEPTH, mode=Mode.SUBTRACT)

    # Sketch17 → Cut-Extrude5 (cut, through all)
    with BuildSketch(Plane(origin=(10, 0, 0), x_dir=(0, 0, -1), z_dir=(1, 0, 0))):
        with Locations((0, 1.7)):
            Rectangle(SKETCH17_W, SKETCH17_H)
    extrude(amount=-CUT_EXTRUDE5_DEPTH, mode=Mode.SUBTRACT)

    # Sketch18 → Boss-Extrude10 (add)
    with BuildSketch(Plane(origin=(0, 0, -13.1), x_dir=(-1, 0, 0), z_dir=(0, 0, -1)).offset(BOSS_EXTRUDE10_START)):
        Polygon((-2.6, 6.5), (-2.6, 3.4), (-1.4, 3.4), (-1.4, 5.3), (1.4, 5.3), (1.4, 3.4), (2.6, 3.4), (2.6, 6.5), align=None)
    boss_extrude10 = extrude(amount=BOSS_EXTRUDE10_DEPTH)

    # Mirror7: Boss-Extrude10 across plane
    add(boss_extrude10.mirror(Plane.XY))

    # Sketch19 → Cut-Extrude6 (cut, through all)
    with BuildSketch(Plane.ZY.offset(7.6)):
        with Locations((0, 5.5)):
            Rectangle(SKETCH19_W, SKETCH19_H)
    extrude(amount=-CUT_EXTRUDE6_DEPTH, mode=Mode.SUBTRACT)

    # Sketch20 → Cut-Extrude7 (cut)
    with BuildSketch(Plane(origin=(0, 0, -13.1), x_dir=(-1, 0, 0), z_dir=(0, 0, -1))):
        with Locations((0, 1.7)):
            Rectangle(SKETCH20_W, SKETCH20_H)
    extrude(amount=-CUT_EXTRUDE7_DEPTH, mode=Mode.SUBTRACT)

    # Sketch21 → Cut-Extrude8 (cut)
    with BuildSketch(Plane.XY.offset(13.1)):
        with Locations((0, 1.7)):
            Rectangle(SKETCH21_W, SKETCH21_H)
    extrude(amount=-CUT_EXTRUDE8_DEPTH, mode=Mode.SUBTRACT)

    # Sketch22 → Boss-Extrude11 (add)
    with BuildSketch(Plane(origin=(0, 0, -6.25), x_dir=(-1, 0, 0), z_dir=(0, 0, -1)).offset(BOSS_EXTRUDE11_START)):
        with BuildLine():
            Line((-1.9, 19.5), (-1.9, 12.092105754))
            ThreePointArc((-1.9, 12.092105754), (0, 12.156989625), (1.9, 12.092105754))
            Line((1.9, 12.092105754), (1.9, 19.5))
            Line((1.9, 19.5), (-1.9, 19.5))
        make_face()
    boss_extrude11 = extrude(amount=BOSS_EXTRUDE11_DEPTH)

    # Chamfer3
    chamfer3_edges = [part.edges().sort_by_distance(p)[0] for p in [
        (0, 19.5, -6.25),
    ]]
    chamfer(chamfer3_edges, length=CHAMFER3_SIZE - 0.0001)  # a hair under: the kernel refuses the full size

    # Mirror10: Boss-Extrude11 across plane
    add(boss_extrude11.mirror(Plane.XY))

    # Chamfer3 of Mirror10
    chamfer3_of_mirror10_edges = [part.edges().sort_by_distance(p)[0] for p in [
        (0, 19.5, 6.25),
    ]]
    chamfer(chamfer3_of_mirror10_edges, length=CHAMFER3_OF_MIRROR10_SIZE - 0.0001)  # a hair under: the kernel refuses the full size

    # Fillet3
    fillet3_edges = [part.edges().sort_by_distance(p)[0] for p in [
        (0, 3.4, 1.740404454),
        (0, 3.4, -1.740404454),
    ]]
    fillet(fillet3_edges, radius=FILLET3_R)

    # Sketch25 → Cut-Extrude10 (cut, two sides: drawn at the far end of the back side and taken through both)
    with BuildSketch(Plane.ZY.offset(10).offset(-CUT_EXTRUDE10_DEPTH_BACK)):
        Polygon((-13.1, 0), (-13.1, 1), (-6.2, 0), align=None)
        Polygon((6.2, 0), (13.1, 0), (13.1, 1), align=None)
    extrude(amount=CUT_EXTRUDE10_DEPTH + CUT_EXTRUDE10_DEPTH_BACK, mode=Mode.SUBTRACT)

    # Sketch26 → Boss-Extrude12 (add)
    # profile 1 of 4: a face of its own
    with BuildSketch(Plane(origin=(0, 3.4, 0), x_dir=(1, 0, 0), z_dir=(0, 1, 0)).offset(BOSS_EXTRUDE12_START)):
        with Locations(Location((-7.7, 9.9, 0), (0, 0, 90))):
            Circle(SKETCH26_R)
        with Locations(Location((-7.7, 9.9, 0), (0, 0, 90))):
            Circle(SKETCH26_R_2, mode=Mode.SUBTRACT)
    # profile 2 of 4: a face of its own
    with BuildSketch(Plane(origin=(0, 3.4, 0), x_dir=(1, 0, 0), z_dir=(0, 1, 0)).offset(BOSS_EXTRUDE12_START)):
        with Locations(Location((7.7, 9.9, 0), (0, 0, 90))):
            Circle(SKETCH26_R)
        with Locations(Location((7.7, 9.9, 0), (0, 0, 90))):
            Circle(SKETCH26_R_2, mode=Mode.SUBTRACT)
    # profile 3 of 4: a face of its own
    with BuildSketch(Plane(origin=(0, 3.4, 0), x_dir=(1, 0, 0), z_dir=(0, 1, 0)).offset(BOSS_EXTRUDE12_START)):
        with Locations(Location((7.7, -9.9, 0), (0, 0, 270))):
            Circle(SKETCH26_R)
        with Locations(Location((7.7, -9.9, 0), (0, 0, 90))):
            Circle(SKETCH26_R_2, mode=Mode.SUBTRACT)
    # profile 4 of 4: a face of its own
    with BuildSketch(Plane(origin=(0, 3.4, 0), x_dir=(1, 0, 0), z_dir=(0, 1, 0)).offset(BOSS_EXTRUDE12_START)):
        with Locations(Location((-7.7, -9.9, 0), (0, 0, 270))):
            Circle(SKETCH26_R)
        with Locations(Location((-7.7, -9.9, 0), (0, 0, 90))):
            Circle(SKETCH26_R_2, mode=Mode.SUBTRACT)
    extrude(amount=BOSS_EXTRUDE12_DEPTH)

    # Sketch27 → Boss-Extrude13 (add)
    with BuildSketch(Plane(origin=(0, 40.8, 0), x_dir=(1, 0, 0), z_dir=(0, 1, 0))):
        with Locations((0, 2.85)):
            Rectangle(SKETCH27_W, SKETCH27_H)
    extrude(amount=BOSS_EXTRUDE13_DEPTH)

    # Sketch28 → Cut-Extrude12 (cut, two sides: drawn at the far end of the back side and taken through both)
    with BuildSketch(Plane(origin=(4.7, 0, 0), x_dir=(0, 0, -1), z_dir=(1, 0, 0)).offset(-CUT_EXTRUDE12_DEPTH_BACK)):
        with Locations((0, 9.819070069)):
            Rectangle(SKETCH28_W, SKETCH28_H)
    extrude(amount=CUT_EXTRUDE12_DEPTH + CUT_EXTRUDE12_DEPTH_BACK, mode=Mode.SUBTRACT)

    # Fillet4
    fillet4_edges = [part.edges().sort_by_distance(p)[0] for p in [
        (10, 2.2, -13.1),
        (10, 2.2, 13.1),
        (-10, 2.2, -13.1),
        (-10, 2.2, 13.1),
    ]]
    fillet(fillet4_edges, radius=FILLET4_R)

    # Sketch29 → Cut-Extrude13 (cut, through all)
    with BuildSketch(Plane(origin=(0, 3.4, 0), x_dir=(1, 0, 0), z_dir=(0, 1, 0))):
        with Locations((9.75, -9.9)):
            Rectangle(SKETCH29_W, SKETCH29_H)
        with Locations((-9.75, -9.9)):
            Rectangle(SKETCH29_W, SKETCH29_H)
        with Locations((9.75, 9.9)):
            Rectangle(SKETCH29_W, SKETCH29_H)
        with Locations((-9.75, 9.9)):
            Rectangle(SKETCH29_W, SKETCH29_H)
    extrude(amount=-CUT_EXTRUDE13_DEPTH, mode=Mode.SUBTRACT)


solid = part.part
